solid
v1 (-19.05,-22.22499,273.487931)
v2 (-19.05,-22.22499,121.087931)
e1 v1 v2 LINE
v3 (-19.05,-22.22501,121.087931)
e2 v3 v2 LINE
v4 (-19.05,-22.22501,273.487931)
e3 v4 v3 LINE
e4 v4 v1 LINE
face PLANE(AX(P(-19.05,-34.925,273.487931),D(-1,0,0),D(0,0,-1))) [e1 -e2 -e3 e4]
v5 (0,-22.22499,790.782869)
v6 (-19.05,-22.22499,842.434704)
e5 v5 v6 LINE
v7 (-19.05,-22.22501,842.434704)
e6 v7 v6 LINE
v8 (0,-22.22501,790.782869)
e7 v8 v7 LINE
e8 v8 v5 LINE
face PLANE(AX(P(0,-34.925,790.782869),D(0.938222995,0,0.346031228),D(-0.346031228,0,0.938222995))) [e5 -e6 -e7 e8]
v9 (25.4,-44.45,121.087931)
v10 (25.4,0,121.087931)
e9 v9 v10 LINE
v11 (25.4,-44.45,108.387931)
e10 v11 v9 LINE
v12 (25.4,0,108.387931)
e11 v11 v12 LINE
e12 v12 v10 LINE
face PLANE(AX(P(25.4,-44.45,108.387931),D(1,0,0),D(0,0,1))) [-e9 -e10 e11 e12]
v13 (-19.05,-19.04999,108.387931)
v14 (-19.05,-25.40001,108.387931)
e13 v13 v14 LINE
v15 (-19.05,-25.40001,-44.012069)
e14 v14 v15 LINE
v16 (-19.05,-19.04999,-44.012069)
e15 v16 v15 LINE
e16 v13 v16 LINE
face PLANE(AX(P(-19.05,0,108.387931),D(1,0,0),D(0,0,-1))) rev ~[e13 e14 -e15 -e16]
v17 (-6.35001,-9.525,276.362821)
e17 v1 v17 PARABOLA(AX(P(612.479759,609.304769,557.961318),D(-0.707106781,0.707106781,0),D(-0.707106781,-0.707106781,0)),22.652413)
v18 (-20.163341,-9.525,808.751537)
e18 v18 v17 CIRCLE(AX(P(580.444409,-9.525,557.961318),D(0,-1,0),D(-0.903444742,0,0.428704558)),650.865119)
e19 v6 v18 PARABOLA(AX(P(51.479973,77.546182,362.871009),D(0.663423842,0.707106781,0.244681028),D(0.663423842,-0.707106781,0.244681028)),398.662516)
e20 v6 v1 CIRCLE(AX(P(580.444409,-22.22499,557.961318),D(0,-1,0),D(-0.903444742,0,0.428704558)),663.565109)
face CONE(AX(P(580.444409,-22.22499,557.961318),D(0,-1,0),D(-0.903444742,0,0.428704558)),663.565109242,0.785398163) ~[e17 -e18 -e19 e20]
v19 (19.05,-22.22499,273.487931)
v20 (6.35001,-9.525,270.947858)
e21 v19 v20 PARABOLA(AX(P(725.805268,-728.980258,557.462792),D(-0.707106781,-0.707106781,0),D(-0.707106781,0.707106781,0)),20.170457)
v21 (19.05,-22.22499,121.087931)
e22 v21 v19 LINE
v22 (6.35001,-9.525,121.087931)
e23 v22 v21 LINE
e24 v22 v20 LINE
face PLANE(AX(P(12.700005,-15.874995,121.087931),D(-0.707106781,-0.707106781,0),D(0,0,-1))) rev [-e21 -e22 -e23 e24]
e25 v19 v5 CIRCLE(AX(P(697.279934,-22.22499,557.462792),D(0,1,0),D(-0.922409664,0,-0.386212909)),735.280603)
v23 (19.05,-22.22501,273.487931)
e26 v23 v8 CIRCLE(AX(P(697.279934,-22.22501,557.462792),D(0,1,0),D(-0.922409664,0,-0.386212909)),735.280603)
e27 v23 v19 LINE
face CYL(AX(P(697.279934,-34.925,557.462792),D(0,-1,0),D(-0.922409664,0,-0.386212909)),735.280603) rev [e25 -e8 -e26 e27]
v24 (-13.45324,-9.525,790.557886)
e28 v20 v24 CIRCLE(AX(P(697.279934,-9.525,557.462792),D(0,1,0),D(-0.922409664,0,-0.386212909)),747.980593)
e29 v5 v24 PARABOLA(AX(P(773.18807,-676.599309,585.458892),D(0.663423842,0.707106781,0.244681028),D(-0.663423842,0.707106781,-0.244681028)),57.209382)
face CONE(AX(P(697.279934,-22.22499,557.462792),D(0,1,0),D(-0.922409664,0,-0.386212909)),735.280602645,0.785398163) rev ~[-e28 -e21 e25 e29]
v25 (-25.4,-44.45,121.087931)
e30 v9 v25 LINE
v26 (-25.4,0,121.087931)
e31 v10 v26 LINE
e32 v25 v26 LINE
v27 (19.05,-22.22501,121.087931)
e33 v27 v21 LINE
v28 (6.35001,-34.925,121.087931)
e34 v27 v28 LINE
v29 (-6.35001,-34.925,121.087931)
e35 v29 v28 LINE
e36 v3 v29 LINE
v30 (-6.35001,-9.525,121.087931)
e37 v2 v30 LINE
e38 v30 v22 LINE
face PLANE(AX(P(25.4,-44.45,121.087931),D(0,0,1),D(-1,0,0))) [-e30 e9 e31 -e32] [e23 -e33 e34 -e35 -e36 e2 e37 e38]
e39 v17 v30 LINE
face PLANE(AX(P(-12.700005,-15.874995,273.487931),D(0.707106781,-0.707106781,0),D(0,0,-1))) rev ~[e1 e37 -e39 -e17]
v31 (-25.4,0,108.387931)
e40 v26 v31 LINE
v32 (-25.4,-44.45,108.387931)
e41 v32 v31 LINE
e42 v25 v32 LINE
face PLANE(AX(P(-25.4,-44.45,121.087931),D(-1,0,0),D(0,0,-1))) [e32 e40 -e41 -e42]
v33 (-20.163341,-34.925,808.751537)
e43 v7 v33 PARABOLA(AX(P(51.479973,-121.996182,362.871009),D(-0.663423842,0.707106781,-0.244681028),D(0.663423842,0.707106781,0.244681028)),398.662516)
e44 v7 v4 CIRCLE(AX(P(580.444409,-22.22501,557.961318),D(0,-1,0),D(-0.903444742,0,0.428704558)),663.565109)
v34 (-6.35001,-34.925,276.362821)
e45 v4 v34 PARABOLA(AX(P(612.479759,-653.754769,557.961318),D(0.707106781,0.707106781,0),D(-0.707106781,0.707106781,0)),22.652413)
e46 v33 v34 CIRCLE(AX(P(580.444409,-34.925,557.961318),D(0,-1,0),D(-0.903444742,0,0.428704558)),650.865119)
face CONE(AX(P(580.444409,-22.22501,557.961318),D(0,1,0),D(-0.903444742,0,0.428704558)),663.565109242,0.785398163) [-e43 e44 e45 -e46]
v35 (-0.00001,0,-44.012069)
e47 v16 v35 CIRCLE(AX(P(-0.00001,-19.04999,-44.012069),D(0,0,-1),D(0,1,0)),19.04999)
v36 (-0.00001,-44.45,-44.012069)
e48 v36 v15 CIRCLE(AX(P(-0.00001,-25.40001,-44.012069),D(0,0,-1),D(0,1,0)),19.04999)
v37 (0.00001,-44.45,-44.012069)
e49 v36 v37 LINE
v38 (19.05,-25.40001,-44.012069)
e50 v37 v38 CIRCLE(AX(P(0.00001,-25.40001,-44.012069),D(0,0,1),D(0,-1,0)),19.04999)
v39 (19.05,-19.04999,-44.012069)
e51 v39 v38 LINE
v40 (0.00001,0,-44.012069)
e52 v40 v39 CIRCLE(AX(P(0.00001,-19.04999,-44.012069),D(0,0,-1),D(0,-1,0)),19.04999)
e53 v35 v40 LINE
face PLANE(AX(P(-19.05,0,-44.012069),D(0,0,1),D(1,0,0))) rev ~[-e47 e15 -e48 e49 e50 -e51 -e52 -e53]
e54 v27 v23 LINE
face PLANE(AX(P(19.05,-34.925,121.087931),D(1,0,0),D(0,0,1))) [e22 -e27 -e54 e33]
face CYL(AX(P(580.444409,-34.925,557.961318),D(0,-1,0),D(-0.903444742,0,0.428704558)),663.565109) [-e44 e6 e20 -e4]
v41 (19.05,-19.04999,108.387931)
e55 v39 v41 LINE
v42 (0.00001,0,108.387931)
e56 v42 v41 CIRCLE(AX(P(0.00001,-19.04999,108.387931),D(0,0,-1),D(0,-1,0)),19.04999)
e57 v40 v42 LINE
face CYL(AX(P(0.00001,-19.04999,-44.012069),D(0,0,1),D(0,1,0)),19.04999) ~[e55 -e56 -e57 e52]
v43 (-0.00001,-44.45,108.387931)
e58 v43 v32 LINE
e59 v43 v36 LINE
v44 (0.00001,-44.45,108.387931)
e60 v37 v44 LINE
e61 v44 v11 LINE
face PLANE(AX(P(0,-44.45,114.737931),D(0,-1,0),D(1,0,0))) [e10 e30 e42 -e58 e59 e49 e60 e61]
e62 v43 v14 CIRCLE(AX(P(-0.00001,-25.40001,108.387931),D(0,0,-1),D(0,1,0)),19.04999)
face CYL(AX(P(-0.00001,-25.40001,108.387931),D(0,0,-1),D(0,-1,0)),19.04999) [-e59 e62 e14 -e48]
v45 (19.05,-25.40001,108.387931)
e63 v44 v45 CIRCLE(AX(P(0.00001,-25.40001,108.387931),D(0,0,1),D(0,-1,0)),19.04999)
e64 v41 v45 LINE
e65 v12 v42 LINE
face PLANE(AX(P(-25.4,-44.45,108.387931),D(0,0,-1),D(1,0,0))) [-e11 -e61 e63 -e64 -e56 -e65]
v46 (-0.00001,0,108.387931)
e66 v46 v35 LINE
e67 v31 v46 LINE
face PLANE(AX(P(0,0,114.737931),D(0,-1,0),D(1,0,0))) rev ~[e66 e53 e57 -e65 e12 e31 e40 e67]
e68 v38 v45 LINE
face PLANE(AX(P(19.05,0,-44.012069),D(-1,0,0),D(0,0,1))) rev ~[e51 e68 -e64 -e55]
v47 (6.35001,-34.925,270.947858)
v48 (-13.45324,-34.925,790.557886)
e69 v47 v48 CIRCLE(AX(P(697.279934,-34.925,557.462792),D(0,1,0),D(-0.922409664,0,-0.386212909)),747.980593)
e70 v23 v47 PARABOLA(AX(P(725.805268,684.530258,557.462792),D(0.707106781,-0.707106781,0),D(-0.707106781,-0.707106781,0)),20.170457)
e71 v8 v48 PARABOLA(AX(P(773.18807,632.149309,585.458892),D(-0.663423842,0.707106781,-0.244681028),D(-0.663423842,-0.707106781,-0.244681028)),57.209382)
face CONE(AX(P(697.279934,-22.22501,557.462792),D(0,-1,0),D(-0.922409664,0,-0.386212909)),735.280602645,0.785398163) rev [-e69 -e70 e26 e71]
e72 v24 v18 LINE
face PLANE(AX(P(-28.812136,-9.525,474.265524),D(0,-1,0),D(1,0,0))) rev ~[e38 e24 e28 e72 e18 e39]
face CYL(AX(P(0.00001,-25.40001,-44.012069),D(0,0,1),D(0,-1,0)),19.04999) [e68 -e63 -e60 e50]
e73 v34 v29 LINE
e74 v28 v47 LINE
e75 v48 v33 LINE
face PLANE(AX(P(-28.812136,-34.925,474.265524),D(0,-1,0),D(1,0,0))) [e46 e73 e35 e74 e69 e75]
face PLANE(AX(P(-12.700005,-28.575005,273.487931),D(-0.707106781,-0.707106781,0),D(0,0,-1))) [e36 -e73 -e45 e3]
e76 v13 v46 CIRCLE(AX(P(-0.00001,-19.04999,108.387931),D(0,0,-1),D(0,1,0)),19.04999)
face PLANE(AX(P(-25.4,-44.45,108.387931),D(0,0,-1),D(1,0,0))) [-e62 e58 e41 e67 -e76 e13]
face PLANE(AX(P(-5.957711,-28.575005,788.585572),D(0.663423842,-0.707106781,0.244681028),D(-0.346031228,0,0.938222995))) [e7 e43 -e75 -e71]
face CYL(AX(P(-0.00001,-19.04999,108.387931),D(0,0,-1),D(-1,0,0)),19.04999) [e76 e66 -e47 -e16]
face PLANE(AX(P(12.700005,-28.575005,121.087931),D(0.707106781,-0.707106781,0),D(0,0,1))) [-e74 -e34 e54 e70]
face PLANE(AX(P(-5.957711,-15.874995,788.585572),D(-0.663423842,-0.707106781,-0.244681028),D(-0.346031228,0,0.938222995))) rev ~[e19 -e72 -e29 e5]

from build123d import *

# Parameters (mm, degrees)
F1_DEPTH = 44.45
F3_DEPTH = 44.45
F5_START = -9.525
F5_DEPTH = 25.4
F6_R     = 19.04999
F7_SIZE2 = 12.69999
F7_SIZE  = 12.69999


# Not quite as in the source:
# - a fillet or chamfer is up to 0.001 mm smaller than in the source, because OpenCascade refuses the exact size


with BuildPart() as f1:
    # F0 (on Front) → F1 (new body)
    with BuildSketch(Plane.XZ):
        Polygon((-19.05, -44.0120689886), (0, -44.0120689886), (19.05, -44.0120689886), (19.05, 108.3879310114), (-19.05, 108.3879310114), align=None)
    extrude(amount=F1_DEPTH)

    # F2 (on face) → F3 (join)
    with BuildSketch(Plane.XZ.offset(44.45)):
        Polygon((-25.4, 108.3879310114), (-19.05, 108.3879310114), (19.05, 108.3879310114), (25.4, 108.3879310114), (25.4, 121.0879310114), (-25.4, 121.0879310114), align=None)
    extrude(amount=-F3_DEPTH)

    # F4 (on face) → F5 (join)
    with BuildSketch(Plane.XZ.offset(44.45).offset(F5_START)):
        with BuildLine():
            Line((-19.05, 273.4879310114), (-19.05, 121.0879310114))
            Line((-19.05, 121.0879310114), (19.05, 121.0879310114))
            Line((19.05, 121.0879310114), (19.05, 273.4879310114))
            ThreePointArc((19.05, 273.4879310114), (-37.5025933071, 530.403553002), (0, 790.7828688622))
            Line((0, 790.7828688622), (-19.05, 842.4347043037))
            ThreePointArc((-19.05, 842.4347043037), (-83.1207001827, 557.9613176576), (-19.05, 273.4879310114))
        make_face()
    extrude(amount=-F5_DEPTH)

    # F6 (radius 19.05 in the source; OpenCascade refuses exactly that, so slightly less here)
    f6_edges = [f1.edges().sort_by_distance(p)[0] for p in [
        (19.05, 0, 32.187931),
        (19.05, -44.45, 32.187931),
        (-19.05, -44.45, 32.187931),
        (-19.05, 0, 32.187931),
    ]]
    fillet(f6_edges, radius=F6_R)

    # F7 (size 12.7 and 12.7 in the source; OpenCascade refuses exactly that, so slightly less here)
    f7_edges = [f1.edges().sort_by_distance(p)[0] for p in [
        (-37.502593, -34.925, 530.403553),
        (-37.502593, -9.525, 530.403553),
        (-83.1207, -34.925, 557.961318),
        (-83.1207, -9.525, 557.961318),
        (-9.525, -34.925, 816.608787),
        (-9.525, -9.525, 816.608787),
        (-19.05, -34.925, 197.287931),
        (-19.05, -9.525, 197.287931),
        (19.05, -34.925, 197.287931),
        (19.05, -9.525, 197.287931),
    ]]
    chamfer(f7_edges, length=F7_SIZE, length2=F7_SIZE2)


solid = f1.part
